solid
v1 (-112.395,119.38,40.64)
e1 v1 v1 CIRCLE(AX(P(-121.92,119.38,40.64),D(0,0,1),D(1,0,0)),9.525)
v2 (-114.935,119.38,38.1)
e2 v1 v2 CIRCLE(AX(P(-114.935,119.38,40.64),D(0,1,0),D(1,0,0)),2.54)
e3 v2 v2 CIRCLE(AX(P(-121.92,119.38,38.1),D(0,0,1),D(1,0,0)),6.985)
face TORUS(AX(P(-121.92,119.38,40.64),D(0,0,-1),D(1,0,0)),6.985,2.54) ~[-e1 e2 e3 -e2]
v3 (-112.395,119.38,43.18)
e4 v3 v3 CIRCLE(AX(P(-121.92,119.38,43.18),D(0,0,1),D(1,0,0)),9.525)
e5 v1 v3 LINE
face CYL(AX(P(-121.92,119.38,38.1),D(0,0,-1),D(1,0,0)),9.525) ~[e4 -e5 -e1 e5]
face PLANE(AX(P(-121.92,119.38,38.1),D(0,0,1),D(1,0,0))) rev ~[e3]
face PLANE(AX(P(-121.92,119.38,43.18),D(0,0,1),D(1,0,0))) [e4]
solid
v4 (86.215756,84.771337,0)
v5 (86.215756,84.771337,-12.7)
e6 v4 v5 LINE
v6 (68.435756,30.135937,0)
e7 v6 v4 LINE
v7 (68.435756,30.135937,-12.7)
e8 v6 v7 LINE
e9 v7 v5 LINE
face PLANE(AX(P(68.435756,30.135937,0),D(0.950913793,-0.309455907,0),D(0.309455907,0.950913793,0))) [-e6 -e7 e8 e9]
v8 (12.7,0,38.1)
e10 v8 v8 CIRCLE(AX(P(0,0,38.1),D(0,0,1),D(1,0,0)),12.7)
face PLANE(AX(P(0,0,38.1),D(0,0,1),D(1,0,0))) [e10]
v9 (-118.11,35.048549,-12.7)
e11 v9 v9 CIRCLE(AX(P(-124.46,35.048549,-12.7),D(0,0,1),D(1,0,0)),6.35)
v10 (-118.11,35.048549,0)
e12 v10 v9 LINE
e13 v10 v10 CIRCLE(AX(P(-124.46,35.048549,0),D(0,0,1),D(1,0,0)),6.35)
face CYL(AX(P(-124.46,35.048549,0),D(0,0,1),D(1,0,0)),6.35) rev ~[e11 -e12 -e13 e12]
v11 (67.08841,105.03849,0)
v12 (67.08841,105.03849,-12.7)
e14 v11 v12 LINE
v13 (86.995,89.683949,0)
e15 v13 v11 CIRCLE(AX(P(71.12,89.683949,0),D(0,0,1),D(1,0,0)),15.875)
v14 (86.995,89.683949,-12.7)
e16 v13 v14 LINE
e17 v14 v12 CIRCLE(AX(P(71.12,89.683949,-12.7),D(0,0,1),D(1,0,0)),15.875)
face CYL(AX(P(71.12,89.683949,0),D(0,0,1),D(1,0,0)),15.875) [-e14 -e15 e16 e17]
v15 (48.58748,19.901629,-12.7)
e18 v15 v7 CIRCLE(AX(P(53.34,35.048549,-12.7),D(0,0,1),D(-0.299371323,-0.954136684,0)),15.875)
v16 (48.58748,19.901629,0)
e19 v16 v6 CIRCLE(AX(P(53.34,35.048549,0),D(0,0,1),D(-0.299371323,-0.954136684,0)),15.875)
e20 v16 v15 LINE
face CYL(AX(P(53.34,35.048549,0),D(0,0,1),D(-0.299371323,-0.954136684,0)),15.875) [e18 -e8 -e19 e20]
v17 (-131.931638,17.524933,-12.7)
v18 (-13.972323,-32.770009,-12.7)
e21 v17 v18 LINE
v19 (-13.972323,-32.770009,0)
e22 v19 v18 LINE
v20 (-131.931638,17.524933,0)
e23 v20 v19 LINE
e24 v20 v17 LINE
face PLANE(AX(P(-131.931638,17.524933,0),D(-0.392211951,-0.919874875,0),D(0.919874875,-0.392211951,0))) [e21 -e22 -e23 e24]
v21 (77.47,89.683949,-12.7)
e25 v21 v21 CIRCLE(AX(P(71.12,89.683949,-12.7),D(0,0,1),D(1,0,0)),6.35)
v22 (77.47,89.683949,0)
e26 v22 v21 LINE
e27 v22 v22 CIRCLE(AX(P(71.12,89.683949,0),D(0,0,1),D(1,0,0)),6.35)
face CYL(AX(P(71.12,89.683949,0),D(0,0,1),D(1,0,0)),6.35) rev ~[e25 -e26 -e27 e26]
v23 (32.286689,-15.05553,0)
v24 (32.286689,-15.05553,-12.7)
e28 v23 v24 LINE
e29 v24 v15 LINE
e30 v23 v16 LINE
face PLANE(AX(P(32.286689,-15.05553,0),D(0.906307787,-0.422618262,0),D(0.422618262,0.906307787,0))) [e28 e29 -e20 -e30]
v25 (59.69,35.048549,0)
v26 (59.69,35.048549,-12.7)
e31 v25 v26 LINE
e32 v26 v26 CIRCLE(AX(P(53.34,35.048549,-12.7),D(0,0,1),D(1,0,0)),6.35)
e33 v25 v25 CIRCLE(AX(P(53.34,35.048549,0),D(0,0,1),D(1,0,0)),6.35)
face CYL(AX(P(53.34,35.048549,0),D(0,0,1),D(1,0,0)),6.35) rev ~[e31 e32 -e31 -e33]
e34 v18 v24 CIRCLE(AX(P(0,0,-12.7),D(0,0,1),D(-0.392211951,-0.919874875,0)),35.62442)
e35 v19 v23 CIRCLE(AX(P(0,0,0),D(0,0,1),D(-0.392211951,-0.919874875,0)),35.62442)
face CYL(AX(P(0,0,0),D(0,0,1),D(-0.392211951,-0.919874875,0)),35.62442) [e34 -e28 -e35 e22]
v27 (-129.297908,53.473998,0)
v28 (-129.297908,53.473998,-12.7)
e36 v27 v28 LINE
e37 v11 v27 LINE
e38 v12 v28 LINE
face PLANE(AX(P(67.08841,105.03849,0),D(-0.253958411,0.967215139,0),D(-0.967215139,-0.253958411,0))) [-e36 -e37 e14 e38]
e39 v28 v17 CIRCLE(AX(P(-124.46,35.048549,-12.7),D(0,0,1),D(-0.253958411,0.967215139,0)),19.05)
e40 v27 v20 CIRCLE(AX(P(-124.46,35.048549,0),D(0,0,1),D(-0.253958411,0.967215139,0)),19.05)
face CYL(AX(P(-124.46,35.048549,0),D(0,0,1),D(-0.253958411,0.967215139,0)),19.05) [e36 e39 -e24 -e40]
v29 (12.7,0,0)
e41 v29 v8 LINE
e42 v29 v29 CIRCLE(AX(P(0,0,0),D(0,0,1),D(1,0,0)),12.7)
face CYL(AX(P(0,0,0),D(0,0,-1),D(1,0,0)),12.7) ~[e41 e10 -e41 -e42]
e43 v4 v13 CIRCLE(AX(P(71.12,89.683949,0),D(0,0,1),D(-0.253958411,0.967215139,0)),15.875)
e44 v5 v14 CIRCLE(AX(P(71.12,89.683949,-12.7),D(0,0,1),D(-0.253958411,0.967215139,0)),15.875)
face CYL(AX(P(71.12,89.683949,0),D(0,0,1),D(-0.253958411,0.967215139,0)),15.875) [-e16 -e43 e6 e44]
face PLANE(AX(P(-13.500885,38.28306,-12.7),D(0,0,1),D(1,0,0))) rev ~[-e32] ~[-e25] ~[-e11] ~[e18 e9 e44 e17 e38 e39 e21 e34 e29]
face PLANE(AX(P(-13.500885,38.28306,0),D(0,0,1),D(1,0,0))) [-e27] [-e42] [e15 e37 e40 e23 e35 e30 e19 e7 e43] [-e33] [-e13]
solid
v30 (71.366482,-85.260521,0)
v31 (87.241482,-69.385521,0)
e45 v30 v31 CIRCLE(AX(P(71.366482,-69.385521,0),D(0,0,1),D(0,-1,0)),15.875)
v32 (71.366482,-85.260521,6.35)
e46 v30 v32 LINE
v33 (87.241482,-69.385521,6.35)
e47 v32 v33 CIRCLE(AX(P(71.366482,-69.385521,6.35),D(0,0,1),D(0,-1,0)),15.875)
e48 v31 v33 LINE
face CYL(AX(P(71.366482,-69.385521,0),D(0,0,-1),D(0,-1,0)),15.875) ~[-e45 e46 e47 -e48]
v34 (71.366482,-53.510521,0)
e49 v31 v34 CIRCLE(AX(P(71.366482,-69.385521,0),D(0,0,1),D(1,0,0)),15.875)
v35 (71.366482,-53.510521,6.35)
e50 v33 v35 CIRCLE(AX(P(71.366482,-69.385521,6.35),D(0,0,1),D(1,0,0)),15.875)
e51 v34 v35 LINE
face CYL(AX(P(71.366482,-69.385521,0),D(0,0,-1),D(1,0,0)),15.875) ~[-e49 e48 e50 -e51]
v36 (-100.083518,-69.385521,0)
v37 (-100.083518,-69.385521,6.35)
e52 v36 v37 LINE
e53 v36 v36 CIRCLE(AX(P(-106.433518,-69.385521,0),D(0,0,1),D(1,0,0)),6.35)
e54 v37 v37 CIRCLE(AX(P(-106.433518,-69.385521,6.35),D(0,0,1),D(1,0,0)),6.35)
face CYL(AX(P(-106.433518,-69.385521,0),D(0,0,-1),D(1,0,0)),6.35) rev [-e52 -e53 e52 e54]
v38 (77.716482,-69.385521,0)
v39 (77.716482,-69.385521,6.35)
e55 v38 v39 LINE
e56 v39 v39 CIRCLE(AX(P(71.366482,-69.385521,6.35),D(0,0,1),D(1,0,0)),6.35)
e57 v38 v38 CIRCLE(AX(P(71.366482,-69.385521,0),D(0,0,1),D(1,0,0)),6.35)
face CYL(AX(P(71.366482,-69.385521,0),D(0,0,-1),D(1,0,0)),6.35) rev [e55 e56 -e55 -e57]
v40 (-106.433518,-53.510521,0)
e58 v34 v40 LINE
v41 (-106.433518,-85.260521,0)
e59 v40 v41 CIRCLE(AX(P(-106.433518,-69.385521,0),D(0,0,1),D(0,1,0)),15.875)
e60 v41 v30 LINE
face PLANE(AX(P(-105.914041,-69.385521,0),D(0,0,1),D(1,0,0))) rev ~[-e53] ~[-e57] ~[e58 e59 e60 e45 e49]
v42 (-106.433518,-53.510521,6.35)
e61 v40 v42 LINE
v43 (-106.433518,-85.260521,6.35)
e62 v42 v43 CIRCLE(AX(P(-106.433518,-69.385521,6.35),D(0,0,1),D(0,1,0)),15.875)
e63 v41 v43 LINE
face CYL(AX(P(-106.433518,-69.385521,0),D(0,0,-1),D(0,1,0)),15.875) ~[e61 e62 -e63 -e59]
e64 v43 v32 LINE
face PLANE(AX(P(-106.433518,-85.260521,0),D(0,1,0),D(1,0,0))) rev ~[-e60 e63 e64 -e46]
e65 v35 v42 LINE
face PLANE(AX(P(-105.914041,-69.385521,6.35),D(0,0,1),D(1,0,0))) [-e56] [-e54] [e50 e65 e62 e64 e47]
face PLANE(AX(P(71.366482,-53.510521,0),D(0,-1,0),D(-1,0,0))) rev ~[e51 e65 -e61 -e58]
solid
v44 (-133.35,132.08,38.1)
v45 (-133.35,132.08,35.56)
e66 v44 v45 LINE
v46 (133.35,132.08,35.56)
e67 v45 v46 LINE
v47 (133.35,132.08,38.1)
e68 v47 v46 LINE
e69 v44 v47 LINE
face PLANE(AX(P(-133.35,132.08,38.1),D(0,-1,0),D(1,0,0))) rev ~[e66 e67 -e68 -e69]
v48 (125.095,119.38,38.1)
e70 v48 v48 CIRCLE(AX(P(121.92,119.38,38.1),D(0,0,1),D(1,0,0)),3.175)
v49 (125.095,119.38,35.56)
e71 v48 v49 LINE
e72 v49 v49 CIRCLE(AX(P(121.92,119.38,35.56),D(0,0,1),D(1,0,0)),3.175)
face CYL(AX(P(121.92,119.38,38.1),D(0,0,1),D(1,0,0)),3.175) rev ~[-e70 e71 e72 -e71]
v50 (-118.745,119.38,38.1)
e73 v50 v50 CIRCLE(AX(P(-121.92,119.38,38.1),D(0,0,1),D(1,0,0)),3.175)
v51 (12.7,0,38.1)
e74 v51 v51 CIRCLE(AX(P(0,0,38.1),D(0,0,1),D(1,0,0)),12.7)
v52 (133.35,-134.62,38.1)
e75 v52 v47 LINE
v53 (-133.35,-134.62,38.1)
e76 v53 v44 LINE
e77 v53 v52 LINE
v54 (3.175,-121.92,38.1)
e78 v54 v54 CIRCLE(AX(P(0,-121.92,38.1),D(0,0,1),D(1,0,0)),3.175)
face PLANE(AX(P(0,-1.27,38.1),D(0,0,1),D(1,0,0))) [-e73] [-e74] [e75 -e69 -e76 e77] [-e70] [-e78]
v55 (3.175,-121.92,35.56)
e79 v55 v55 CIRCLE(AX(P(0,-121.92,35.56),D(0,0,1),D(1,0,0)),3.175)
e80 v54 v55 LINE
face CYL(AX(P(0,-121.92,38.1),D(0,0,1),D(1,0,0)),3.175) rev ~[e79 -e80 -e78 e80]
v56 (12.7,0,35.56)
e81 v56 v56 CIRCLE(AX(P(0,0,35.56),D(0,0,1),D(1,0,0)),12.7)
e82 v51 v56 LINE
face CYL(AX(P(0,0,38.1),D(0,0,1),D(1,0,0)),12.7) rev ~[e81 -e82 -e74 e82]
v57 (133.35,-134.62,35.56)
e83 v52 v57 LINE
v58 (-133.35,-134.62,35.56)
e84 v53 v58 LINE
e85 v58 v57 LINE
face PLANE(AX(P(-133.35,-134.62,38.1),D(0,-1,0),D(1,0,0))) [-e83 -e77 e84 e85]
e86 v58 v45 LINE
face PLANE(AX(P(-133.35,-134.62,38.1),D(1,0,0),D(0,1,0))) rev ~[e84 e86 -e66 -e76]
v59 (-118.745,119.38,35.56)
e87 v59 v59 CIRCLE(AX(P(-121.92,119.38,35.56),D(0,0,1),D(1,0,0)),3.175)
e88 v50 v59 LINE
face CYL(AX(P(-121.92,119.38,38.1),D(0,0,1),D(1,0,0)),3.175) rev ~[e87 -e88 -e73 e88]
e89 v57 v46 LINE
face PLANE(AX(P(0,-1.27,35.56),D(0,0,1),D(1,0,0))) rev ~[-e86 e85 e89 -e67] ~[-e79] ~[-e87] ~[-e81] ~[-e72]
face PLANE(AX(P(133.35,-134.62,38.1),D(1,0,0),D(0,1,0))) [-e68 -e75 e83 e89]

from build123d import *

# Parameters (mm, degrees)
F0_R     = 6.35
F0_R_2   = 12.7
F1_DEPTH = 12.7
F2_DEPTH = 38.1
F3_R     = 6.35
F4_DEPTH = 6.35
F5_W     = 266.7
F5_H     = 266.7
F5_R     = 9.525
F5_R_2   = 12.7
F5_R_3   = 3.175
F6_DEPTH = 2.54
F7_DEPTH = 5.08
F8_R     = 2.54


# Not quite as in the source:
# - a feature names something its author has since deleted; it is built from what else it names


with BuildPart() as f1:
    # F0 (on Top) → F1 (new body)
    with BuildSketch(Plane.XY):
        with BuildLine():
            ThreePointArc((-13.9723231754, -32.7700086168), (-19.638525588, 29.7225098602), (35.6244197099, 0))
            ThreePointArc((35.6244197099, 0), (34.7799787187, -7.7105356488), (32.2866889917, -15.0555303333))
            Line((32.2866889917, -15.0555303333), (48.5874802437, 19.9016293163))
            ThreePointArc((48.5874802437, 19.9016293163), (43.9440068681, 47.8442882261), (69.215, 35.0485491671))
            ThreePointArc((69.215, 35.0485491671), (69.018978903, 32.5615337753), (68.435756465, 30.1359366494))
            Line((68.435756465, 30.1359366494), (86.215756465, 84.7713366494))
            ThreePointArc((86.215756465, 84.7713366494), (59.5747274901, 78.7879724935), (67.0884102259, 105.0384895019))
            Line((67.0884102259, 105.0384895019), (-129.2979077289, 53.4739975689))
            ThreePointArc((-129.2979077289, 53.4739975689), (-112.8251309039, 50.1327236927), (-105.41, 35.0485491671))
            ThreePointArc((-105.41, 35.0485491671), (-113.9583857843, 19.1545692104), (-131.931637676, 17.5249328041))
            Line((-131.931637676, 17.5249328041), (-13.9723231754, -32.7700086168))
        make_face()
        with BuildLine():
            ThreePointArc((-129.2979077289, 53.4739975689), (-143.4590800142, 36.4404753919), (-131.931637676, 17.5249328041))
            ThreePointArc((-131.931637676, 17.5249328041), (-113.9583857843, 19.1545692104), (-105.41, 35.0485491671))
            ThreePointArc((-105.41, 35.0485491671), (-112.8251309039, 50.1327236927), (-129.2979077289, 53.4739975689))
        make_face()
        with Locations((-124.46, 35.0485491671)):
            Circle(F0_R, mode=Mode.SUBTRACT)
        with BuildLine():
            ThreePointArc((32.2866889917, -15.0555303333), (34.7799787187, -7.7105356488), (35.6244197099, 0))
            ThreePointArc((35.6244197099, 0), (-19.638525588, 29.7225098602), (-13.9723231754, -32.7700086168))
            ThreePointArc((-13.9723231754, -32.7700086168), (12.7398855579, -33.2685225947), (32.2866889917, -15.0555303333))
        make_face()
        Circle(F0_R_2, mode=Mode.SUBTRACT)
        with BuildLine():
            ThreePointArc((69.215, 35.0485491671), (43.9440068681, 47.8442882261), (48.5874802437, 19.9016293163))
            ThreePointArc((48.5874802437, 19.9016293163), (60.6153623999, 20.9388104399), (68.435756465, 30.1359366494))
            ThreePointArc((68.435756465, 30.1359366494), (69.018978903, 32.5615337753), (69.215, 35.0485491671))
        make_face()
        with Locations((53.34, 35.0485491671)):
            Circle(F0_R, mode=Mode.SUBTRACT)
        Circle(F0_R_2)
        with BuildLine():
            ThreePointArc((86.995, 89.6839491671), (80.8157242467, 102.2540946051), (67.0884102259, 105.0384895019))
            ThreePointArc((67.0884102259, 105.0384895019), (59.5747274901, 78.7879724935), (86.215756465, 84.7713366494))
            ThreePointArc((86.215756465, 84.7713366494), (86.798978903, 87.1969337753), (86.995, 89.6839491671))
        make_face()
        with Locations((71.12, 89.6839491671)):
            Circle(F0_R, mode=Mode.SUBTRACT)
    extrude(amount=-F1_DEPTH)

    # F0 (on Top) → F2 (join)
    with BuildSketch(Plane.XY):
        Circle(F0_R_2)
    extrude(amount=F2_DEPTH)


with BuildPart() as f4:
    # F3 (on Top) → F4 (new body)
    with BuildSketch(Plane.XY):
        with BuildLine():
            ThreePointArc((-106.4335181124, -85.2605211139), (-95.2081979611, -80.6108412652), (-90.5585181124, -69.3855211139))
            ThreePointArc((-90.5585181124, -69.3855211139), (-95.2081979611, -58.1602009625), (-106.4335181124, -53.5105211139))
            ThreePointArc((-106.4335181124, -53.5105211139), (-122.3085181124, -69.3855211139), (-106.4335181124, -85.2605211139))
        make_face()
        with Locations((-106.4335181124, -69.3855211139)):
            Circle(F3_R, mode=Mode.SUBTRACT)
        with BuildLine():
            ThreePointArc((-106.4335181124, -53.5105211139), (-95.2081979611, -58.1602009625), (-90.5585181124, -69.3855211139))
            ThreePointArc((-90.5585181124, -69.3855211139), (-95.2081979611, -80.6108412652), (-106.4335181124, -85.2605211139))
            Line((-106.4335181124, -85.2605211139), (71.3664818876, -85.2605211139))
            ThreePointArc((71.3664818876, -85.2605211139), (55.4914818876, -69.3855211139), (71.3664818876, -53.5105211139))
            Line((71.3664818876, -53.5105211139), (-106.4335181124, -53.5105211139))
        make_face()
        with BuildLine():
            ThreePointArc((87.2414818876, -69.3855211139), (82.5918020389, -58.1602009625), (71.3664818876, -53.5105211139))
            ThreePointArc((71.3664818876, -53.5105211139), (55.4914818876, -69.3855211139), (71.3664818876, -85.2605211139))
            ThreePointArc((71.3664818876, -85.2605211139), (82.5918020389, -80.6108412652), (87.2414818876, -69.3855211139))
        make_face()
        with Locations((71.3664818876, -69.3855211139)):
            Circle(F3_R, mode=Mode.SUBTRACT)
    extrude(amount=F4_DEPTH)


with BuildPart() as f6:
    # F5 (on face) → F6 (new body)
    with BuildSketch(Plane.XY.offset(38.1)):
        with Locations((0, -1.27)):
            Rectangle(F5_W, F5_H)
        with Locations((0, -121.92)):
            Circle(F5_R, mode=Mode.SUBTRACT)
        with Locations((-121.92, 119.38)):
            Circle(F5_R, mode=Mode.SUBTRACT)
        Circle(F5_R_2, mode=Mode.SUBTRACT)
        with Locations((121.92, 119.38)):
            Circle(F5_R, mode=Mode.SUBTRACT)
        with Locations((-121.92, 119.38)):
            Circle(F5_R)
        with Locations((-121.92, 119.38)):
            Circle(F5_R_3, mode=Mode.SUBTRACT)
        with Locations((121.92, 119.38)):
            Circle(F5_R)
        with Locations((121.92, 119.38)):
            Circle(F5_R_3, mode=Mode.SUBTRACT)
        with Locations((0, -121.92)):
            Circle(F5_R)
        with Locations((0, -121.92)):
            Circle(F5_R_3, mode=Mode.SUBTRACT)
    extrude(amount=-F6_DEPTH)


with BuildPart() as f7:
    # F5 (on face) → F7 (new body)
    with BuildSketch(Plane.XY.offset(38.1)):
        with Locations((-121.92, 119.38)):
            Circle(F5_R)
        with Locations((-121.92, 119.38)):
            Circle(F5_R_3, mode=Mode.SUBTRACT)
        with Locations((-121.92, 119.38)):
            Circle(F5_R_3)
    extrude(amount=F7_DEPTH)

    # F8
    f8_edges = [f7.edges().sort_by_distance(p)[0] for p in [
        (-131.445, 119.38, 38.1),
    ]]
    fillet(f8_edges, radius=F8_R)


solid = Compound([f1.part, f4.part, f6.part, f7.part])
